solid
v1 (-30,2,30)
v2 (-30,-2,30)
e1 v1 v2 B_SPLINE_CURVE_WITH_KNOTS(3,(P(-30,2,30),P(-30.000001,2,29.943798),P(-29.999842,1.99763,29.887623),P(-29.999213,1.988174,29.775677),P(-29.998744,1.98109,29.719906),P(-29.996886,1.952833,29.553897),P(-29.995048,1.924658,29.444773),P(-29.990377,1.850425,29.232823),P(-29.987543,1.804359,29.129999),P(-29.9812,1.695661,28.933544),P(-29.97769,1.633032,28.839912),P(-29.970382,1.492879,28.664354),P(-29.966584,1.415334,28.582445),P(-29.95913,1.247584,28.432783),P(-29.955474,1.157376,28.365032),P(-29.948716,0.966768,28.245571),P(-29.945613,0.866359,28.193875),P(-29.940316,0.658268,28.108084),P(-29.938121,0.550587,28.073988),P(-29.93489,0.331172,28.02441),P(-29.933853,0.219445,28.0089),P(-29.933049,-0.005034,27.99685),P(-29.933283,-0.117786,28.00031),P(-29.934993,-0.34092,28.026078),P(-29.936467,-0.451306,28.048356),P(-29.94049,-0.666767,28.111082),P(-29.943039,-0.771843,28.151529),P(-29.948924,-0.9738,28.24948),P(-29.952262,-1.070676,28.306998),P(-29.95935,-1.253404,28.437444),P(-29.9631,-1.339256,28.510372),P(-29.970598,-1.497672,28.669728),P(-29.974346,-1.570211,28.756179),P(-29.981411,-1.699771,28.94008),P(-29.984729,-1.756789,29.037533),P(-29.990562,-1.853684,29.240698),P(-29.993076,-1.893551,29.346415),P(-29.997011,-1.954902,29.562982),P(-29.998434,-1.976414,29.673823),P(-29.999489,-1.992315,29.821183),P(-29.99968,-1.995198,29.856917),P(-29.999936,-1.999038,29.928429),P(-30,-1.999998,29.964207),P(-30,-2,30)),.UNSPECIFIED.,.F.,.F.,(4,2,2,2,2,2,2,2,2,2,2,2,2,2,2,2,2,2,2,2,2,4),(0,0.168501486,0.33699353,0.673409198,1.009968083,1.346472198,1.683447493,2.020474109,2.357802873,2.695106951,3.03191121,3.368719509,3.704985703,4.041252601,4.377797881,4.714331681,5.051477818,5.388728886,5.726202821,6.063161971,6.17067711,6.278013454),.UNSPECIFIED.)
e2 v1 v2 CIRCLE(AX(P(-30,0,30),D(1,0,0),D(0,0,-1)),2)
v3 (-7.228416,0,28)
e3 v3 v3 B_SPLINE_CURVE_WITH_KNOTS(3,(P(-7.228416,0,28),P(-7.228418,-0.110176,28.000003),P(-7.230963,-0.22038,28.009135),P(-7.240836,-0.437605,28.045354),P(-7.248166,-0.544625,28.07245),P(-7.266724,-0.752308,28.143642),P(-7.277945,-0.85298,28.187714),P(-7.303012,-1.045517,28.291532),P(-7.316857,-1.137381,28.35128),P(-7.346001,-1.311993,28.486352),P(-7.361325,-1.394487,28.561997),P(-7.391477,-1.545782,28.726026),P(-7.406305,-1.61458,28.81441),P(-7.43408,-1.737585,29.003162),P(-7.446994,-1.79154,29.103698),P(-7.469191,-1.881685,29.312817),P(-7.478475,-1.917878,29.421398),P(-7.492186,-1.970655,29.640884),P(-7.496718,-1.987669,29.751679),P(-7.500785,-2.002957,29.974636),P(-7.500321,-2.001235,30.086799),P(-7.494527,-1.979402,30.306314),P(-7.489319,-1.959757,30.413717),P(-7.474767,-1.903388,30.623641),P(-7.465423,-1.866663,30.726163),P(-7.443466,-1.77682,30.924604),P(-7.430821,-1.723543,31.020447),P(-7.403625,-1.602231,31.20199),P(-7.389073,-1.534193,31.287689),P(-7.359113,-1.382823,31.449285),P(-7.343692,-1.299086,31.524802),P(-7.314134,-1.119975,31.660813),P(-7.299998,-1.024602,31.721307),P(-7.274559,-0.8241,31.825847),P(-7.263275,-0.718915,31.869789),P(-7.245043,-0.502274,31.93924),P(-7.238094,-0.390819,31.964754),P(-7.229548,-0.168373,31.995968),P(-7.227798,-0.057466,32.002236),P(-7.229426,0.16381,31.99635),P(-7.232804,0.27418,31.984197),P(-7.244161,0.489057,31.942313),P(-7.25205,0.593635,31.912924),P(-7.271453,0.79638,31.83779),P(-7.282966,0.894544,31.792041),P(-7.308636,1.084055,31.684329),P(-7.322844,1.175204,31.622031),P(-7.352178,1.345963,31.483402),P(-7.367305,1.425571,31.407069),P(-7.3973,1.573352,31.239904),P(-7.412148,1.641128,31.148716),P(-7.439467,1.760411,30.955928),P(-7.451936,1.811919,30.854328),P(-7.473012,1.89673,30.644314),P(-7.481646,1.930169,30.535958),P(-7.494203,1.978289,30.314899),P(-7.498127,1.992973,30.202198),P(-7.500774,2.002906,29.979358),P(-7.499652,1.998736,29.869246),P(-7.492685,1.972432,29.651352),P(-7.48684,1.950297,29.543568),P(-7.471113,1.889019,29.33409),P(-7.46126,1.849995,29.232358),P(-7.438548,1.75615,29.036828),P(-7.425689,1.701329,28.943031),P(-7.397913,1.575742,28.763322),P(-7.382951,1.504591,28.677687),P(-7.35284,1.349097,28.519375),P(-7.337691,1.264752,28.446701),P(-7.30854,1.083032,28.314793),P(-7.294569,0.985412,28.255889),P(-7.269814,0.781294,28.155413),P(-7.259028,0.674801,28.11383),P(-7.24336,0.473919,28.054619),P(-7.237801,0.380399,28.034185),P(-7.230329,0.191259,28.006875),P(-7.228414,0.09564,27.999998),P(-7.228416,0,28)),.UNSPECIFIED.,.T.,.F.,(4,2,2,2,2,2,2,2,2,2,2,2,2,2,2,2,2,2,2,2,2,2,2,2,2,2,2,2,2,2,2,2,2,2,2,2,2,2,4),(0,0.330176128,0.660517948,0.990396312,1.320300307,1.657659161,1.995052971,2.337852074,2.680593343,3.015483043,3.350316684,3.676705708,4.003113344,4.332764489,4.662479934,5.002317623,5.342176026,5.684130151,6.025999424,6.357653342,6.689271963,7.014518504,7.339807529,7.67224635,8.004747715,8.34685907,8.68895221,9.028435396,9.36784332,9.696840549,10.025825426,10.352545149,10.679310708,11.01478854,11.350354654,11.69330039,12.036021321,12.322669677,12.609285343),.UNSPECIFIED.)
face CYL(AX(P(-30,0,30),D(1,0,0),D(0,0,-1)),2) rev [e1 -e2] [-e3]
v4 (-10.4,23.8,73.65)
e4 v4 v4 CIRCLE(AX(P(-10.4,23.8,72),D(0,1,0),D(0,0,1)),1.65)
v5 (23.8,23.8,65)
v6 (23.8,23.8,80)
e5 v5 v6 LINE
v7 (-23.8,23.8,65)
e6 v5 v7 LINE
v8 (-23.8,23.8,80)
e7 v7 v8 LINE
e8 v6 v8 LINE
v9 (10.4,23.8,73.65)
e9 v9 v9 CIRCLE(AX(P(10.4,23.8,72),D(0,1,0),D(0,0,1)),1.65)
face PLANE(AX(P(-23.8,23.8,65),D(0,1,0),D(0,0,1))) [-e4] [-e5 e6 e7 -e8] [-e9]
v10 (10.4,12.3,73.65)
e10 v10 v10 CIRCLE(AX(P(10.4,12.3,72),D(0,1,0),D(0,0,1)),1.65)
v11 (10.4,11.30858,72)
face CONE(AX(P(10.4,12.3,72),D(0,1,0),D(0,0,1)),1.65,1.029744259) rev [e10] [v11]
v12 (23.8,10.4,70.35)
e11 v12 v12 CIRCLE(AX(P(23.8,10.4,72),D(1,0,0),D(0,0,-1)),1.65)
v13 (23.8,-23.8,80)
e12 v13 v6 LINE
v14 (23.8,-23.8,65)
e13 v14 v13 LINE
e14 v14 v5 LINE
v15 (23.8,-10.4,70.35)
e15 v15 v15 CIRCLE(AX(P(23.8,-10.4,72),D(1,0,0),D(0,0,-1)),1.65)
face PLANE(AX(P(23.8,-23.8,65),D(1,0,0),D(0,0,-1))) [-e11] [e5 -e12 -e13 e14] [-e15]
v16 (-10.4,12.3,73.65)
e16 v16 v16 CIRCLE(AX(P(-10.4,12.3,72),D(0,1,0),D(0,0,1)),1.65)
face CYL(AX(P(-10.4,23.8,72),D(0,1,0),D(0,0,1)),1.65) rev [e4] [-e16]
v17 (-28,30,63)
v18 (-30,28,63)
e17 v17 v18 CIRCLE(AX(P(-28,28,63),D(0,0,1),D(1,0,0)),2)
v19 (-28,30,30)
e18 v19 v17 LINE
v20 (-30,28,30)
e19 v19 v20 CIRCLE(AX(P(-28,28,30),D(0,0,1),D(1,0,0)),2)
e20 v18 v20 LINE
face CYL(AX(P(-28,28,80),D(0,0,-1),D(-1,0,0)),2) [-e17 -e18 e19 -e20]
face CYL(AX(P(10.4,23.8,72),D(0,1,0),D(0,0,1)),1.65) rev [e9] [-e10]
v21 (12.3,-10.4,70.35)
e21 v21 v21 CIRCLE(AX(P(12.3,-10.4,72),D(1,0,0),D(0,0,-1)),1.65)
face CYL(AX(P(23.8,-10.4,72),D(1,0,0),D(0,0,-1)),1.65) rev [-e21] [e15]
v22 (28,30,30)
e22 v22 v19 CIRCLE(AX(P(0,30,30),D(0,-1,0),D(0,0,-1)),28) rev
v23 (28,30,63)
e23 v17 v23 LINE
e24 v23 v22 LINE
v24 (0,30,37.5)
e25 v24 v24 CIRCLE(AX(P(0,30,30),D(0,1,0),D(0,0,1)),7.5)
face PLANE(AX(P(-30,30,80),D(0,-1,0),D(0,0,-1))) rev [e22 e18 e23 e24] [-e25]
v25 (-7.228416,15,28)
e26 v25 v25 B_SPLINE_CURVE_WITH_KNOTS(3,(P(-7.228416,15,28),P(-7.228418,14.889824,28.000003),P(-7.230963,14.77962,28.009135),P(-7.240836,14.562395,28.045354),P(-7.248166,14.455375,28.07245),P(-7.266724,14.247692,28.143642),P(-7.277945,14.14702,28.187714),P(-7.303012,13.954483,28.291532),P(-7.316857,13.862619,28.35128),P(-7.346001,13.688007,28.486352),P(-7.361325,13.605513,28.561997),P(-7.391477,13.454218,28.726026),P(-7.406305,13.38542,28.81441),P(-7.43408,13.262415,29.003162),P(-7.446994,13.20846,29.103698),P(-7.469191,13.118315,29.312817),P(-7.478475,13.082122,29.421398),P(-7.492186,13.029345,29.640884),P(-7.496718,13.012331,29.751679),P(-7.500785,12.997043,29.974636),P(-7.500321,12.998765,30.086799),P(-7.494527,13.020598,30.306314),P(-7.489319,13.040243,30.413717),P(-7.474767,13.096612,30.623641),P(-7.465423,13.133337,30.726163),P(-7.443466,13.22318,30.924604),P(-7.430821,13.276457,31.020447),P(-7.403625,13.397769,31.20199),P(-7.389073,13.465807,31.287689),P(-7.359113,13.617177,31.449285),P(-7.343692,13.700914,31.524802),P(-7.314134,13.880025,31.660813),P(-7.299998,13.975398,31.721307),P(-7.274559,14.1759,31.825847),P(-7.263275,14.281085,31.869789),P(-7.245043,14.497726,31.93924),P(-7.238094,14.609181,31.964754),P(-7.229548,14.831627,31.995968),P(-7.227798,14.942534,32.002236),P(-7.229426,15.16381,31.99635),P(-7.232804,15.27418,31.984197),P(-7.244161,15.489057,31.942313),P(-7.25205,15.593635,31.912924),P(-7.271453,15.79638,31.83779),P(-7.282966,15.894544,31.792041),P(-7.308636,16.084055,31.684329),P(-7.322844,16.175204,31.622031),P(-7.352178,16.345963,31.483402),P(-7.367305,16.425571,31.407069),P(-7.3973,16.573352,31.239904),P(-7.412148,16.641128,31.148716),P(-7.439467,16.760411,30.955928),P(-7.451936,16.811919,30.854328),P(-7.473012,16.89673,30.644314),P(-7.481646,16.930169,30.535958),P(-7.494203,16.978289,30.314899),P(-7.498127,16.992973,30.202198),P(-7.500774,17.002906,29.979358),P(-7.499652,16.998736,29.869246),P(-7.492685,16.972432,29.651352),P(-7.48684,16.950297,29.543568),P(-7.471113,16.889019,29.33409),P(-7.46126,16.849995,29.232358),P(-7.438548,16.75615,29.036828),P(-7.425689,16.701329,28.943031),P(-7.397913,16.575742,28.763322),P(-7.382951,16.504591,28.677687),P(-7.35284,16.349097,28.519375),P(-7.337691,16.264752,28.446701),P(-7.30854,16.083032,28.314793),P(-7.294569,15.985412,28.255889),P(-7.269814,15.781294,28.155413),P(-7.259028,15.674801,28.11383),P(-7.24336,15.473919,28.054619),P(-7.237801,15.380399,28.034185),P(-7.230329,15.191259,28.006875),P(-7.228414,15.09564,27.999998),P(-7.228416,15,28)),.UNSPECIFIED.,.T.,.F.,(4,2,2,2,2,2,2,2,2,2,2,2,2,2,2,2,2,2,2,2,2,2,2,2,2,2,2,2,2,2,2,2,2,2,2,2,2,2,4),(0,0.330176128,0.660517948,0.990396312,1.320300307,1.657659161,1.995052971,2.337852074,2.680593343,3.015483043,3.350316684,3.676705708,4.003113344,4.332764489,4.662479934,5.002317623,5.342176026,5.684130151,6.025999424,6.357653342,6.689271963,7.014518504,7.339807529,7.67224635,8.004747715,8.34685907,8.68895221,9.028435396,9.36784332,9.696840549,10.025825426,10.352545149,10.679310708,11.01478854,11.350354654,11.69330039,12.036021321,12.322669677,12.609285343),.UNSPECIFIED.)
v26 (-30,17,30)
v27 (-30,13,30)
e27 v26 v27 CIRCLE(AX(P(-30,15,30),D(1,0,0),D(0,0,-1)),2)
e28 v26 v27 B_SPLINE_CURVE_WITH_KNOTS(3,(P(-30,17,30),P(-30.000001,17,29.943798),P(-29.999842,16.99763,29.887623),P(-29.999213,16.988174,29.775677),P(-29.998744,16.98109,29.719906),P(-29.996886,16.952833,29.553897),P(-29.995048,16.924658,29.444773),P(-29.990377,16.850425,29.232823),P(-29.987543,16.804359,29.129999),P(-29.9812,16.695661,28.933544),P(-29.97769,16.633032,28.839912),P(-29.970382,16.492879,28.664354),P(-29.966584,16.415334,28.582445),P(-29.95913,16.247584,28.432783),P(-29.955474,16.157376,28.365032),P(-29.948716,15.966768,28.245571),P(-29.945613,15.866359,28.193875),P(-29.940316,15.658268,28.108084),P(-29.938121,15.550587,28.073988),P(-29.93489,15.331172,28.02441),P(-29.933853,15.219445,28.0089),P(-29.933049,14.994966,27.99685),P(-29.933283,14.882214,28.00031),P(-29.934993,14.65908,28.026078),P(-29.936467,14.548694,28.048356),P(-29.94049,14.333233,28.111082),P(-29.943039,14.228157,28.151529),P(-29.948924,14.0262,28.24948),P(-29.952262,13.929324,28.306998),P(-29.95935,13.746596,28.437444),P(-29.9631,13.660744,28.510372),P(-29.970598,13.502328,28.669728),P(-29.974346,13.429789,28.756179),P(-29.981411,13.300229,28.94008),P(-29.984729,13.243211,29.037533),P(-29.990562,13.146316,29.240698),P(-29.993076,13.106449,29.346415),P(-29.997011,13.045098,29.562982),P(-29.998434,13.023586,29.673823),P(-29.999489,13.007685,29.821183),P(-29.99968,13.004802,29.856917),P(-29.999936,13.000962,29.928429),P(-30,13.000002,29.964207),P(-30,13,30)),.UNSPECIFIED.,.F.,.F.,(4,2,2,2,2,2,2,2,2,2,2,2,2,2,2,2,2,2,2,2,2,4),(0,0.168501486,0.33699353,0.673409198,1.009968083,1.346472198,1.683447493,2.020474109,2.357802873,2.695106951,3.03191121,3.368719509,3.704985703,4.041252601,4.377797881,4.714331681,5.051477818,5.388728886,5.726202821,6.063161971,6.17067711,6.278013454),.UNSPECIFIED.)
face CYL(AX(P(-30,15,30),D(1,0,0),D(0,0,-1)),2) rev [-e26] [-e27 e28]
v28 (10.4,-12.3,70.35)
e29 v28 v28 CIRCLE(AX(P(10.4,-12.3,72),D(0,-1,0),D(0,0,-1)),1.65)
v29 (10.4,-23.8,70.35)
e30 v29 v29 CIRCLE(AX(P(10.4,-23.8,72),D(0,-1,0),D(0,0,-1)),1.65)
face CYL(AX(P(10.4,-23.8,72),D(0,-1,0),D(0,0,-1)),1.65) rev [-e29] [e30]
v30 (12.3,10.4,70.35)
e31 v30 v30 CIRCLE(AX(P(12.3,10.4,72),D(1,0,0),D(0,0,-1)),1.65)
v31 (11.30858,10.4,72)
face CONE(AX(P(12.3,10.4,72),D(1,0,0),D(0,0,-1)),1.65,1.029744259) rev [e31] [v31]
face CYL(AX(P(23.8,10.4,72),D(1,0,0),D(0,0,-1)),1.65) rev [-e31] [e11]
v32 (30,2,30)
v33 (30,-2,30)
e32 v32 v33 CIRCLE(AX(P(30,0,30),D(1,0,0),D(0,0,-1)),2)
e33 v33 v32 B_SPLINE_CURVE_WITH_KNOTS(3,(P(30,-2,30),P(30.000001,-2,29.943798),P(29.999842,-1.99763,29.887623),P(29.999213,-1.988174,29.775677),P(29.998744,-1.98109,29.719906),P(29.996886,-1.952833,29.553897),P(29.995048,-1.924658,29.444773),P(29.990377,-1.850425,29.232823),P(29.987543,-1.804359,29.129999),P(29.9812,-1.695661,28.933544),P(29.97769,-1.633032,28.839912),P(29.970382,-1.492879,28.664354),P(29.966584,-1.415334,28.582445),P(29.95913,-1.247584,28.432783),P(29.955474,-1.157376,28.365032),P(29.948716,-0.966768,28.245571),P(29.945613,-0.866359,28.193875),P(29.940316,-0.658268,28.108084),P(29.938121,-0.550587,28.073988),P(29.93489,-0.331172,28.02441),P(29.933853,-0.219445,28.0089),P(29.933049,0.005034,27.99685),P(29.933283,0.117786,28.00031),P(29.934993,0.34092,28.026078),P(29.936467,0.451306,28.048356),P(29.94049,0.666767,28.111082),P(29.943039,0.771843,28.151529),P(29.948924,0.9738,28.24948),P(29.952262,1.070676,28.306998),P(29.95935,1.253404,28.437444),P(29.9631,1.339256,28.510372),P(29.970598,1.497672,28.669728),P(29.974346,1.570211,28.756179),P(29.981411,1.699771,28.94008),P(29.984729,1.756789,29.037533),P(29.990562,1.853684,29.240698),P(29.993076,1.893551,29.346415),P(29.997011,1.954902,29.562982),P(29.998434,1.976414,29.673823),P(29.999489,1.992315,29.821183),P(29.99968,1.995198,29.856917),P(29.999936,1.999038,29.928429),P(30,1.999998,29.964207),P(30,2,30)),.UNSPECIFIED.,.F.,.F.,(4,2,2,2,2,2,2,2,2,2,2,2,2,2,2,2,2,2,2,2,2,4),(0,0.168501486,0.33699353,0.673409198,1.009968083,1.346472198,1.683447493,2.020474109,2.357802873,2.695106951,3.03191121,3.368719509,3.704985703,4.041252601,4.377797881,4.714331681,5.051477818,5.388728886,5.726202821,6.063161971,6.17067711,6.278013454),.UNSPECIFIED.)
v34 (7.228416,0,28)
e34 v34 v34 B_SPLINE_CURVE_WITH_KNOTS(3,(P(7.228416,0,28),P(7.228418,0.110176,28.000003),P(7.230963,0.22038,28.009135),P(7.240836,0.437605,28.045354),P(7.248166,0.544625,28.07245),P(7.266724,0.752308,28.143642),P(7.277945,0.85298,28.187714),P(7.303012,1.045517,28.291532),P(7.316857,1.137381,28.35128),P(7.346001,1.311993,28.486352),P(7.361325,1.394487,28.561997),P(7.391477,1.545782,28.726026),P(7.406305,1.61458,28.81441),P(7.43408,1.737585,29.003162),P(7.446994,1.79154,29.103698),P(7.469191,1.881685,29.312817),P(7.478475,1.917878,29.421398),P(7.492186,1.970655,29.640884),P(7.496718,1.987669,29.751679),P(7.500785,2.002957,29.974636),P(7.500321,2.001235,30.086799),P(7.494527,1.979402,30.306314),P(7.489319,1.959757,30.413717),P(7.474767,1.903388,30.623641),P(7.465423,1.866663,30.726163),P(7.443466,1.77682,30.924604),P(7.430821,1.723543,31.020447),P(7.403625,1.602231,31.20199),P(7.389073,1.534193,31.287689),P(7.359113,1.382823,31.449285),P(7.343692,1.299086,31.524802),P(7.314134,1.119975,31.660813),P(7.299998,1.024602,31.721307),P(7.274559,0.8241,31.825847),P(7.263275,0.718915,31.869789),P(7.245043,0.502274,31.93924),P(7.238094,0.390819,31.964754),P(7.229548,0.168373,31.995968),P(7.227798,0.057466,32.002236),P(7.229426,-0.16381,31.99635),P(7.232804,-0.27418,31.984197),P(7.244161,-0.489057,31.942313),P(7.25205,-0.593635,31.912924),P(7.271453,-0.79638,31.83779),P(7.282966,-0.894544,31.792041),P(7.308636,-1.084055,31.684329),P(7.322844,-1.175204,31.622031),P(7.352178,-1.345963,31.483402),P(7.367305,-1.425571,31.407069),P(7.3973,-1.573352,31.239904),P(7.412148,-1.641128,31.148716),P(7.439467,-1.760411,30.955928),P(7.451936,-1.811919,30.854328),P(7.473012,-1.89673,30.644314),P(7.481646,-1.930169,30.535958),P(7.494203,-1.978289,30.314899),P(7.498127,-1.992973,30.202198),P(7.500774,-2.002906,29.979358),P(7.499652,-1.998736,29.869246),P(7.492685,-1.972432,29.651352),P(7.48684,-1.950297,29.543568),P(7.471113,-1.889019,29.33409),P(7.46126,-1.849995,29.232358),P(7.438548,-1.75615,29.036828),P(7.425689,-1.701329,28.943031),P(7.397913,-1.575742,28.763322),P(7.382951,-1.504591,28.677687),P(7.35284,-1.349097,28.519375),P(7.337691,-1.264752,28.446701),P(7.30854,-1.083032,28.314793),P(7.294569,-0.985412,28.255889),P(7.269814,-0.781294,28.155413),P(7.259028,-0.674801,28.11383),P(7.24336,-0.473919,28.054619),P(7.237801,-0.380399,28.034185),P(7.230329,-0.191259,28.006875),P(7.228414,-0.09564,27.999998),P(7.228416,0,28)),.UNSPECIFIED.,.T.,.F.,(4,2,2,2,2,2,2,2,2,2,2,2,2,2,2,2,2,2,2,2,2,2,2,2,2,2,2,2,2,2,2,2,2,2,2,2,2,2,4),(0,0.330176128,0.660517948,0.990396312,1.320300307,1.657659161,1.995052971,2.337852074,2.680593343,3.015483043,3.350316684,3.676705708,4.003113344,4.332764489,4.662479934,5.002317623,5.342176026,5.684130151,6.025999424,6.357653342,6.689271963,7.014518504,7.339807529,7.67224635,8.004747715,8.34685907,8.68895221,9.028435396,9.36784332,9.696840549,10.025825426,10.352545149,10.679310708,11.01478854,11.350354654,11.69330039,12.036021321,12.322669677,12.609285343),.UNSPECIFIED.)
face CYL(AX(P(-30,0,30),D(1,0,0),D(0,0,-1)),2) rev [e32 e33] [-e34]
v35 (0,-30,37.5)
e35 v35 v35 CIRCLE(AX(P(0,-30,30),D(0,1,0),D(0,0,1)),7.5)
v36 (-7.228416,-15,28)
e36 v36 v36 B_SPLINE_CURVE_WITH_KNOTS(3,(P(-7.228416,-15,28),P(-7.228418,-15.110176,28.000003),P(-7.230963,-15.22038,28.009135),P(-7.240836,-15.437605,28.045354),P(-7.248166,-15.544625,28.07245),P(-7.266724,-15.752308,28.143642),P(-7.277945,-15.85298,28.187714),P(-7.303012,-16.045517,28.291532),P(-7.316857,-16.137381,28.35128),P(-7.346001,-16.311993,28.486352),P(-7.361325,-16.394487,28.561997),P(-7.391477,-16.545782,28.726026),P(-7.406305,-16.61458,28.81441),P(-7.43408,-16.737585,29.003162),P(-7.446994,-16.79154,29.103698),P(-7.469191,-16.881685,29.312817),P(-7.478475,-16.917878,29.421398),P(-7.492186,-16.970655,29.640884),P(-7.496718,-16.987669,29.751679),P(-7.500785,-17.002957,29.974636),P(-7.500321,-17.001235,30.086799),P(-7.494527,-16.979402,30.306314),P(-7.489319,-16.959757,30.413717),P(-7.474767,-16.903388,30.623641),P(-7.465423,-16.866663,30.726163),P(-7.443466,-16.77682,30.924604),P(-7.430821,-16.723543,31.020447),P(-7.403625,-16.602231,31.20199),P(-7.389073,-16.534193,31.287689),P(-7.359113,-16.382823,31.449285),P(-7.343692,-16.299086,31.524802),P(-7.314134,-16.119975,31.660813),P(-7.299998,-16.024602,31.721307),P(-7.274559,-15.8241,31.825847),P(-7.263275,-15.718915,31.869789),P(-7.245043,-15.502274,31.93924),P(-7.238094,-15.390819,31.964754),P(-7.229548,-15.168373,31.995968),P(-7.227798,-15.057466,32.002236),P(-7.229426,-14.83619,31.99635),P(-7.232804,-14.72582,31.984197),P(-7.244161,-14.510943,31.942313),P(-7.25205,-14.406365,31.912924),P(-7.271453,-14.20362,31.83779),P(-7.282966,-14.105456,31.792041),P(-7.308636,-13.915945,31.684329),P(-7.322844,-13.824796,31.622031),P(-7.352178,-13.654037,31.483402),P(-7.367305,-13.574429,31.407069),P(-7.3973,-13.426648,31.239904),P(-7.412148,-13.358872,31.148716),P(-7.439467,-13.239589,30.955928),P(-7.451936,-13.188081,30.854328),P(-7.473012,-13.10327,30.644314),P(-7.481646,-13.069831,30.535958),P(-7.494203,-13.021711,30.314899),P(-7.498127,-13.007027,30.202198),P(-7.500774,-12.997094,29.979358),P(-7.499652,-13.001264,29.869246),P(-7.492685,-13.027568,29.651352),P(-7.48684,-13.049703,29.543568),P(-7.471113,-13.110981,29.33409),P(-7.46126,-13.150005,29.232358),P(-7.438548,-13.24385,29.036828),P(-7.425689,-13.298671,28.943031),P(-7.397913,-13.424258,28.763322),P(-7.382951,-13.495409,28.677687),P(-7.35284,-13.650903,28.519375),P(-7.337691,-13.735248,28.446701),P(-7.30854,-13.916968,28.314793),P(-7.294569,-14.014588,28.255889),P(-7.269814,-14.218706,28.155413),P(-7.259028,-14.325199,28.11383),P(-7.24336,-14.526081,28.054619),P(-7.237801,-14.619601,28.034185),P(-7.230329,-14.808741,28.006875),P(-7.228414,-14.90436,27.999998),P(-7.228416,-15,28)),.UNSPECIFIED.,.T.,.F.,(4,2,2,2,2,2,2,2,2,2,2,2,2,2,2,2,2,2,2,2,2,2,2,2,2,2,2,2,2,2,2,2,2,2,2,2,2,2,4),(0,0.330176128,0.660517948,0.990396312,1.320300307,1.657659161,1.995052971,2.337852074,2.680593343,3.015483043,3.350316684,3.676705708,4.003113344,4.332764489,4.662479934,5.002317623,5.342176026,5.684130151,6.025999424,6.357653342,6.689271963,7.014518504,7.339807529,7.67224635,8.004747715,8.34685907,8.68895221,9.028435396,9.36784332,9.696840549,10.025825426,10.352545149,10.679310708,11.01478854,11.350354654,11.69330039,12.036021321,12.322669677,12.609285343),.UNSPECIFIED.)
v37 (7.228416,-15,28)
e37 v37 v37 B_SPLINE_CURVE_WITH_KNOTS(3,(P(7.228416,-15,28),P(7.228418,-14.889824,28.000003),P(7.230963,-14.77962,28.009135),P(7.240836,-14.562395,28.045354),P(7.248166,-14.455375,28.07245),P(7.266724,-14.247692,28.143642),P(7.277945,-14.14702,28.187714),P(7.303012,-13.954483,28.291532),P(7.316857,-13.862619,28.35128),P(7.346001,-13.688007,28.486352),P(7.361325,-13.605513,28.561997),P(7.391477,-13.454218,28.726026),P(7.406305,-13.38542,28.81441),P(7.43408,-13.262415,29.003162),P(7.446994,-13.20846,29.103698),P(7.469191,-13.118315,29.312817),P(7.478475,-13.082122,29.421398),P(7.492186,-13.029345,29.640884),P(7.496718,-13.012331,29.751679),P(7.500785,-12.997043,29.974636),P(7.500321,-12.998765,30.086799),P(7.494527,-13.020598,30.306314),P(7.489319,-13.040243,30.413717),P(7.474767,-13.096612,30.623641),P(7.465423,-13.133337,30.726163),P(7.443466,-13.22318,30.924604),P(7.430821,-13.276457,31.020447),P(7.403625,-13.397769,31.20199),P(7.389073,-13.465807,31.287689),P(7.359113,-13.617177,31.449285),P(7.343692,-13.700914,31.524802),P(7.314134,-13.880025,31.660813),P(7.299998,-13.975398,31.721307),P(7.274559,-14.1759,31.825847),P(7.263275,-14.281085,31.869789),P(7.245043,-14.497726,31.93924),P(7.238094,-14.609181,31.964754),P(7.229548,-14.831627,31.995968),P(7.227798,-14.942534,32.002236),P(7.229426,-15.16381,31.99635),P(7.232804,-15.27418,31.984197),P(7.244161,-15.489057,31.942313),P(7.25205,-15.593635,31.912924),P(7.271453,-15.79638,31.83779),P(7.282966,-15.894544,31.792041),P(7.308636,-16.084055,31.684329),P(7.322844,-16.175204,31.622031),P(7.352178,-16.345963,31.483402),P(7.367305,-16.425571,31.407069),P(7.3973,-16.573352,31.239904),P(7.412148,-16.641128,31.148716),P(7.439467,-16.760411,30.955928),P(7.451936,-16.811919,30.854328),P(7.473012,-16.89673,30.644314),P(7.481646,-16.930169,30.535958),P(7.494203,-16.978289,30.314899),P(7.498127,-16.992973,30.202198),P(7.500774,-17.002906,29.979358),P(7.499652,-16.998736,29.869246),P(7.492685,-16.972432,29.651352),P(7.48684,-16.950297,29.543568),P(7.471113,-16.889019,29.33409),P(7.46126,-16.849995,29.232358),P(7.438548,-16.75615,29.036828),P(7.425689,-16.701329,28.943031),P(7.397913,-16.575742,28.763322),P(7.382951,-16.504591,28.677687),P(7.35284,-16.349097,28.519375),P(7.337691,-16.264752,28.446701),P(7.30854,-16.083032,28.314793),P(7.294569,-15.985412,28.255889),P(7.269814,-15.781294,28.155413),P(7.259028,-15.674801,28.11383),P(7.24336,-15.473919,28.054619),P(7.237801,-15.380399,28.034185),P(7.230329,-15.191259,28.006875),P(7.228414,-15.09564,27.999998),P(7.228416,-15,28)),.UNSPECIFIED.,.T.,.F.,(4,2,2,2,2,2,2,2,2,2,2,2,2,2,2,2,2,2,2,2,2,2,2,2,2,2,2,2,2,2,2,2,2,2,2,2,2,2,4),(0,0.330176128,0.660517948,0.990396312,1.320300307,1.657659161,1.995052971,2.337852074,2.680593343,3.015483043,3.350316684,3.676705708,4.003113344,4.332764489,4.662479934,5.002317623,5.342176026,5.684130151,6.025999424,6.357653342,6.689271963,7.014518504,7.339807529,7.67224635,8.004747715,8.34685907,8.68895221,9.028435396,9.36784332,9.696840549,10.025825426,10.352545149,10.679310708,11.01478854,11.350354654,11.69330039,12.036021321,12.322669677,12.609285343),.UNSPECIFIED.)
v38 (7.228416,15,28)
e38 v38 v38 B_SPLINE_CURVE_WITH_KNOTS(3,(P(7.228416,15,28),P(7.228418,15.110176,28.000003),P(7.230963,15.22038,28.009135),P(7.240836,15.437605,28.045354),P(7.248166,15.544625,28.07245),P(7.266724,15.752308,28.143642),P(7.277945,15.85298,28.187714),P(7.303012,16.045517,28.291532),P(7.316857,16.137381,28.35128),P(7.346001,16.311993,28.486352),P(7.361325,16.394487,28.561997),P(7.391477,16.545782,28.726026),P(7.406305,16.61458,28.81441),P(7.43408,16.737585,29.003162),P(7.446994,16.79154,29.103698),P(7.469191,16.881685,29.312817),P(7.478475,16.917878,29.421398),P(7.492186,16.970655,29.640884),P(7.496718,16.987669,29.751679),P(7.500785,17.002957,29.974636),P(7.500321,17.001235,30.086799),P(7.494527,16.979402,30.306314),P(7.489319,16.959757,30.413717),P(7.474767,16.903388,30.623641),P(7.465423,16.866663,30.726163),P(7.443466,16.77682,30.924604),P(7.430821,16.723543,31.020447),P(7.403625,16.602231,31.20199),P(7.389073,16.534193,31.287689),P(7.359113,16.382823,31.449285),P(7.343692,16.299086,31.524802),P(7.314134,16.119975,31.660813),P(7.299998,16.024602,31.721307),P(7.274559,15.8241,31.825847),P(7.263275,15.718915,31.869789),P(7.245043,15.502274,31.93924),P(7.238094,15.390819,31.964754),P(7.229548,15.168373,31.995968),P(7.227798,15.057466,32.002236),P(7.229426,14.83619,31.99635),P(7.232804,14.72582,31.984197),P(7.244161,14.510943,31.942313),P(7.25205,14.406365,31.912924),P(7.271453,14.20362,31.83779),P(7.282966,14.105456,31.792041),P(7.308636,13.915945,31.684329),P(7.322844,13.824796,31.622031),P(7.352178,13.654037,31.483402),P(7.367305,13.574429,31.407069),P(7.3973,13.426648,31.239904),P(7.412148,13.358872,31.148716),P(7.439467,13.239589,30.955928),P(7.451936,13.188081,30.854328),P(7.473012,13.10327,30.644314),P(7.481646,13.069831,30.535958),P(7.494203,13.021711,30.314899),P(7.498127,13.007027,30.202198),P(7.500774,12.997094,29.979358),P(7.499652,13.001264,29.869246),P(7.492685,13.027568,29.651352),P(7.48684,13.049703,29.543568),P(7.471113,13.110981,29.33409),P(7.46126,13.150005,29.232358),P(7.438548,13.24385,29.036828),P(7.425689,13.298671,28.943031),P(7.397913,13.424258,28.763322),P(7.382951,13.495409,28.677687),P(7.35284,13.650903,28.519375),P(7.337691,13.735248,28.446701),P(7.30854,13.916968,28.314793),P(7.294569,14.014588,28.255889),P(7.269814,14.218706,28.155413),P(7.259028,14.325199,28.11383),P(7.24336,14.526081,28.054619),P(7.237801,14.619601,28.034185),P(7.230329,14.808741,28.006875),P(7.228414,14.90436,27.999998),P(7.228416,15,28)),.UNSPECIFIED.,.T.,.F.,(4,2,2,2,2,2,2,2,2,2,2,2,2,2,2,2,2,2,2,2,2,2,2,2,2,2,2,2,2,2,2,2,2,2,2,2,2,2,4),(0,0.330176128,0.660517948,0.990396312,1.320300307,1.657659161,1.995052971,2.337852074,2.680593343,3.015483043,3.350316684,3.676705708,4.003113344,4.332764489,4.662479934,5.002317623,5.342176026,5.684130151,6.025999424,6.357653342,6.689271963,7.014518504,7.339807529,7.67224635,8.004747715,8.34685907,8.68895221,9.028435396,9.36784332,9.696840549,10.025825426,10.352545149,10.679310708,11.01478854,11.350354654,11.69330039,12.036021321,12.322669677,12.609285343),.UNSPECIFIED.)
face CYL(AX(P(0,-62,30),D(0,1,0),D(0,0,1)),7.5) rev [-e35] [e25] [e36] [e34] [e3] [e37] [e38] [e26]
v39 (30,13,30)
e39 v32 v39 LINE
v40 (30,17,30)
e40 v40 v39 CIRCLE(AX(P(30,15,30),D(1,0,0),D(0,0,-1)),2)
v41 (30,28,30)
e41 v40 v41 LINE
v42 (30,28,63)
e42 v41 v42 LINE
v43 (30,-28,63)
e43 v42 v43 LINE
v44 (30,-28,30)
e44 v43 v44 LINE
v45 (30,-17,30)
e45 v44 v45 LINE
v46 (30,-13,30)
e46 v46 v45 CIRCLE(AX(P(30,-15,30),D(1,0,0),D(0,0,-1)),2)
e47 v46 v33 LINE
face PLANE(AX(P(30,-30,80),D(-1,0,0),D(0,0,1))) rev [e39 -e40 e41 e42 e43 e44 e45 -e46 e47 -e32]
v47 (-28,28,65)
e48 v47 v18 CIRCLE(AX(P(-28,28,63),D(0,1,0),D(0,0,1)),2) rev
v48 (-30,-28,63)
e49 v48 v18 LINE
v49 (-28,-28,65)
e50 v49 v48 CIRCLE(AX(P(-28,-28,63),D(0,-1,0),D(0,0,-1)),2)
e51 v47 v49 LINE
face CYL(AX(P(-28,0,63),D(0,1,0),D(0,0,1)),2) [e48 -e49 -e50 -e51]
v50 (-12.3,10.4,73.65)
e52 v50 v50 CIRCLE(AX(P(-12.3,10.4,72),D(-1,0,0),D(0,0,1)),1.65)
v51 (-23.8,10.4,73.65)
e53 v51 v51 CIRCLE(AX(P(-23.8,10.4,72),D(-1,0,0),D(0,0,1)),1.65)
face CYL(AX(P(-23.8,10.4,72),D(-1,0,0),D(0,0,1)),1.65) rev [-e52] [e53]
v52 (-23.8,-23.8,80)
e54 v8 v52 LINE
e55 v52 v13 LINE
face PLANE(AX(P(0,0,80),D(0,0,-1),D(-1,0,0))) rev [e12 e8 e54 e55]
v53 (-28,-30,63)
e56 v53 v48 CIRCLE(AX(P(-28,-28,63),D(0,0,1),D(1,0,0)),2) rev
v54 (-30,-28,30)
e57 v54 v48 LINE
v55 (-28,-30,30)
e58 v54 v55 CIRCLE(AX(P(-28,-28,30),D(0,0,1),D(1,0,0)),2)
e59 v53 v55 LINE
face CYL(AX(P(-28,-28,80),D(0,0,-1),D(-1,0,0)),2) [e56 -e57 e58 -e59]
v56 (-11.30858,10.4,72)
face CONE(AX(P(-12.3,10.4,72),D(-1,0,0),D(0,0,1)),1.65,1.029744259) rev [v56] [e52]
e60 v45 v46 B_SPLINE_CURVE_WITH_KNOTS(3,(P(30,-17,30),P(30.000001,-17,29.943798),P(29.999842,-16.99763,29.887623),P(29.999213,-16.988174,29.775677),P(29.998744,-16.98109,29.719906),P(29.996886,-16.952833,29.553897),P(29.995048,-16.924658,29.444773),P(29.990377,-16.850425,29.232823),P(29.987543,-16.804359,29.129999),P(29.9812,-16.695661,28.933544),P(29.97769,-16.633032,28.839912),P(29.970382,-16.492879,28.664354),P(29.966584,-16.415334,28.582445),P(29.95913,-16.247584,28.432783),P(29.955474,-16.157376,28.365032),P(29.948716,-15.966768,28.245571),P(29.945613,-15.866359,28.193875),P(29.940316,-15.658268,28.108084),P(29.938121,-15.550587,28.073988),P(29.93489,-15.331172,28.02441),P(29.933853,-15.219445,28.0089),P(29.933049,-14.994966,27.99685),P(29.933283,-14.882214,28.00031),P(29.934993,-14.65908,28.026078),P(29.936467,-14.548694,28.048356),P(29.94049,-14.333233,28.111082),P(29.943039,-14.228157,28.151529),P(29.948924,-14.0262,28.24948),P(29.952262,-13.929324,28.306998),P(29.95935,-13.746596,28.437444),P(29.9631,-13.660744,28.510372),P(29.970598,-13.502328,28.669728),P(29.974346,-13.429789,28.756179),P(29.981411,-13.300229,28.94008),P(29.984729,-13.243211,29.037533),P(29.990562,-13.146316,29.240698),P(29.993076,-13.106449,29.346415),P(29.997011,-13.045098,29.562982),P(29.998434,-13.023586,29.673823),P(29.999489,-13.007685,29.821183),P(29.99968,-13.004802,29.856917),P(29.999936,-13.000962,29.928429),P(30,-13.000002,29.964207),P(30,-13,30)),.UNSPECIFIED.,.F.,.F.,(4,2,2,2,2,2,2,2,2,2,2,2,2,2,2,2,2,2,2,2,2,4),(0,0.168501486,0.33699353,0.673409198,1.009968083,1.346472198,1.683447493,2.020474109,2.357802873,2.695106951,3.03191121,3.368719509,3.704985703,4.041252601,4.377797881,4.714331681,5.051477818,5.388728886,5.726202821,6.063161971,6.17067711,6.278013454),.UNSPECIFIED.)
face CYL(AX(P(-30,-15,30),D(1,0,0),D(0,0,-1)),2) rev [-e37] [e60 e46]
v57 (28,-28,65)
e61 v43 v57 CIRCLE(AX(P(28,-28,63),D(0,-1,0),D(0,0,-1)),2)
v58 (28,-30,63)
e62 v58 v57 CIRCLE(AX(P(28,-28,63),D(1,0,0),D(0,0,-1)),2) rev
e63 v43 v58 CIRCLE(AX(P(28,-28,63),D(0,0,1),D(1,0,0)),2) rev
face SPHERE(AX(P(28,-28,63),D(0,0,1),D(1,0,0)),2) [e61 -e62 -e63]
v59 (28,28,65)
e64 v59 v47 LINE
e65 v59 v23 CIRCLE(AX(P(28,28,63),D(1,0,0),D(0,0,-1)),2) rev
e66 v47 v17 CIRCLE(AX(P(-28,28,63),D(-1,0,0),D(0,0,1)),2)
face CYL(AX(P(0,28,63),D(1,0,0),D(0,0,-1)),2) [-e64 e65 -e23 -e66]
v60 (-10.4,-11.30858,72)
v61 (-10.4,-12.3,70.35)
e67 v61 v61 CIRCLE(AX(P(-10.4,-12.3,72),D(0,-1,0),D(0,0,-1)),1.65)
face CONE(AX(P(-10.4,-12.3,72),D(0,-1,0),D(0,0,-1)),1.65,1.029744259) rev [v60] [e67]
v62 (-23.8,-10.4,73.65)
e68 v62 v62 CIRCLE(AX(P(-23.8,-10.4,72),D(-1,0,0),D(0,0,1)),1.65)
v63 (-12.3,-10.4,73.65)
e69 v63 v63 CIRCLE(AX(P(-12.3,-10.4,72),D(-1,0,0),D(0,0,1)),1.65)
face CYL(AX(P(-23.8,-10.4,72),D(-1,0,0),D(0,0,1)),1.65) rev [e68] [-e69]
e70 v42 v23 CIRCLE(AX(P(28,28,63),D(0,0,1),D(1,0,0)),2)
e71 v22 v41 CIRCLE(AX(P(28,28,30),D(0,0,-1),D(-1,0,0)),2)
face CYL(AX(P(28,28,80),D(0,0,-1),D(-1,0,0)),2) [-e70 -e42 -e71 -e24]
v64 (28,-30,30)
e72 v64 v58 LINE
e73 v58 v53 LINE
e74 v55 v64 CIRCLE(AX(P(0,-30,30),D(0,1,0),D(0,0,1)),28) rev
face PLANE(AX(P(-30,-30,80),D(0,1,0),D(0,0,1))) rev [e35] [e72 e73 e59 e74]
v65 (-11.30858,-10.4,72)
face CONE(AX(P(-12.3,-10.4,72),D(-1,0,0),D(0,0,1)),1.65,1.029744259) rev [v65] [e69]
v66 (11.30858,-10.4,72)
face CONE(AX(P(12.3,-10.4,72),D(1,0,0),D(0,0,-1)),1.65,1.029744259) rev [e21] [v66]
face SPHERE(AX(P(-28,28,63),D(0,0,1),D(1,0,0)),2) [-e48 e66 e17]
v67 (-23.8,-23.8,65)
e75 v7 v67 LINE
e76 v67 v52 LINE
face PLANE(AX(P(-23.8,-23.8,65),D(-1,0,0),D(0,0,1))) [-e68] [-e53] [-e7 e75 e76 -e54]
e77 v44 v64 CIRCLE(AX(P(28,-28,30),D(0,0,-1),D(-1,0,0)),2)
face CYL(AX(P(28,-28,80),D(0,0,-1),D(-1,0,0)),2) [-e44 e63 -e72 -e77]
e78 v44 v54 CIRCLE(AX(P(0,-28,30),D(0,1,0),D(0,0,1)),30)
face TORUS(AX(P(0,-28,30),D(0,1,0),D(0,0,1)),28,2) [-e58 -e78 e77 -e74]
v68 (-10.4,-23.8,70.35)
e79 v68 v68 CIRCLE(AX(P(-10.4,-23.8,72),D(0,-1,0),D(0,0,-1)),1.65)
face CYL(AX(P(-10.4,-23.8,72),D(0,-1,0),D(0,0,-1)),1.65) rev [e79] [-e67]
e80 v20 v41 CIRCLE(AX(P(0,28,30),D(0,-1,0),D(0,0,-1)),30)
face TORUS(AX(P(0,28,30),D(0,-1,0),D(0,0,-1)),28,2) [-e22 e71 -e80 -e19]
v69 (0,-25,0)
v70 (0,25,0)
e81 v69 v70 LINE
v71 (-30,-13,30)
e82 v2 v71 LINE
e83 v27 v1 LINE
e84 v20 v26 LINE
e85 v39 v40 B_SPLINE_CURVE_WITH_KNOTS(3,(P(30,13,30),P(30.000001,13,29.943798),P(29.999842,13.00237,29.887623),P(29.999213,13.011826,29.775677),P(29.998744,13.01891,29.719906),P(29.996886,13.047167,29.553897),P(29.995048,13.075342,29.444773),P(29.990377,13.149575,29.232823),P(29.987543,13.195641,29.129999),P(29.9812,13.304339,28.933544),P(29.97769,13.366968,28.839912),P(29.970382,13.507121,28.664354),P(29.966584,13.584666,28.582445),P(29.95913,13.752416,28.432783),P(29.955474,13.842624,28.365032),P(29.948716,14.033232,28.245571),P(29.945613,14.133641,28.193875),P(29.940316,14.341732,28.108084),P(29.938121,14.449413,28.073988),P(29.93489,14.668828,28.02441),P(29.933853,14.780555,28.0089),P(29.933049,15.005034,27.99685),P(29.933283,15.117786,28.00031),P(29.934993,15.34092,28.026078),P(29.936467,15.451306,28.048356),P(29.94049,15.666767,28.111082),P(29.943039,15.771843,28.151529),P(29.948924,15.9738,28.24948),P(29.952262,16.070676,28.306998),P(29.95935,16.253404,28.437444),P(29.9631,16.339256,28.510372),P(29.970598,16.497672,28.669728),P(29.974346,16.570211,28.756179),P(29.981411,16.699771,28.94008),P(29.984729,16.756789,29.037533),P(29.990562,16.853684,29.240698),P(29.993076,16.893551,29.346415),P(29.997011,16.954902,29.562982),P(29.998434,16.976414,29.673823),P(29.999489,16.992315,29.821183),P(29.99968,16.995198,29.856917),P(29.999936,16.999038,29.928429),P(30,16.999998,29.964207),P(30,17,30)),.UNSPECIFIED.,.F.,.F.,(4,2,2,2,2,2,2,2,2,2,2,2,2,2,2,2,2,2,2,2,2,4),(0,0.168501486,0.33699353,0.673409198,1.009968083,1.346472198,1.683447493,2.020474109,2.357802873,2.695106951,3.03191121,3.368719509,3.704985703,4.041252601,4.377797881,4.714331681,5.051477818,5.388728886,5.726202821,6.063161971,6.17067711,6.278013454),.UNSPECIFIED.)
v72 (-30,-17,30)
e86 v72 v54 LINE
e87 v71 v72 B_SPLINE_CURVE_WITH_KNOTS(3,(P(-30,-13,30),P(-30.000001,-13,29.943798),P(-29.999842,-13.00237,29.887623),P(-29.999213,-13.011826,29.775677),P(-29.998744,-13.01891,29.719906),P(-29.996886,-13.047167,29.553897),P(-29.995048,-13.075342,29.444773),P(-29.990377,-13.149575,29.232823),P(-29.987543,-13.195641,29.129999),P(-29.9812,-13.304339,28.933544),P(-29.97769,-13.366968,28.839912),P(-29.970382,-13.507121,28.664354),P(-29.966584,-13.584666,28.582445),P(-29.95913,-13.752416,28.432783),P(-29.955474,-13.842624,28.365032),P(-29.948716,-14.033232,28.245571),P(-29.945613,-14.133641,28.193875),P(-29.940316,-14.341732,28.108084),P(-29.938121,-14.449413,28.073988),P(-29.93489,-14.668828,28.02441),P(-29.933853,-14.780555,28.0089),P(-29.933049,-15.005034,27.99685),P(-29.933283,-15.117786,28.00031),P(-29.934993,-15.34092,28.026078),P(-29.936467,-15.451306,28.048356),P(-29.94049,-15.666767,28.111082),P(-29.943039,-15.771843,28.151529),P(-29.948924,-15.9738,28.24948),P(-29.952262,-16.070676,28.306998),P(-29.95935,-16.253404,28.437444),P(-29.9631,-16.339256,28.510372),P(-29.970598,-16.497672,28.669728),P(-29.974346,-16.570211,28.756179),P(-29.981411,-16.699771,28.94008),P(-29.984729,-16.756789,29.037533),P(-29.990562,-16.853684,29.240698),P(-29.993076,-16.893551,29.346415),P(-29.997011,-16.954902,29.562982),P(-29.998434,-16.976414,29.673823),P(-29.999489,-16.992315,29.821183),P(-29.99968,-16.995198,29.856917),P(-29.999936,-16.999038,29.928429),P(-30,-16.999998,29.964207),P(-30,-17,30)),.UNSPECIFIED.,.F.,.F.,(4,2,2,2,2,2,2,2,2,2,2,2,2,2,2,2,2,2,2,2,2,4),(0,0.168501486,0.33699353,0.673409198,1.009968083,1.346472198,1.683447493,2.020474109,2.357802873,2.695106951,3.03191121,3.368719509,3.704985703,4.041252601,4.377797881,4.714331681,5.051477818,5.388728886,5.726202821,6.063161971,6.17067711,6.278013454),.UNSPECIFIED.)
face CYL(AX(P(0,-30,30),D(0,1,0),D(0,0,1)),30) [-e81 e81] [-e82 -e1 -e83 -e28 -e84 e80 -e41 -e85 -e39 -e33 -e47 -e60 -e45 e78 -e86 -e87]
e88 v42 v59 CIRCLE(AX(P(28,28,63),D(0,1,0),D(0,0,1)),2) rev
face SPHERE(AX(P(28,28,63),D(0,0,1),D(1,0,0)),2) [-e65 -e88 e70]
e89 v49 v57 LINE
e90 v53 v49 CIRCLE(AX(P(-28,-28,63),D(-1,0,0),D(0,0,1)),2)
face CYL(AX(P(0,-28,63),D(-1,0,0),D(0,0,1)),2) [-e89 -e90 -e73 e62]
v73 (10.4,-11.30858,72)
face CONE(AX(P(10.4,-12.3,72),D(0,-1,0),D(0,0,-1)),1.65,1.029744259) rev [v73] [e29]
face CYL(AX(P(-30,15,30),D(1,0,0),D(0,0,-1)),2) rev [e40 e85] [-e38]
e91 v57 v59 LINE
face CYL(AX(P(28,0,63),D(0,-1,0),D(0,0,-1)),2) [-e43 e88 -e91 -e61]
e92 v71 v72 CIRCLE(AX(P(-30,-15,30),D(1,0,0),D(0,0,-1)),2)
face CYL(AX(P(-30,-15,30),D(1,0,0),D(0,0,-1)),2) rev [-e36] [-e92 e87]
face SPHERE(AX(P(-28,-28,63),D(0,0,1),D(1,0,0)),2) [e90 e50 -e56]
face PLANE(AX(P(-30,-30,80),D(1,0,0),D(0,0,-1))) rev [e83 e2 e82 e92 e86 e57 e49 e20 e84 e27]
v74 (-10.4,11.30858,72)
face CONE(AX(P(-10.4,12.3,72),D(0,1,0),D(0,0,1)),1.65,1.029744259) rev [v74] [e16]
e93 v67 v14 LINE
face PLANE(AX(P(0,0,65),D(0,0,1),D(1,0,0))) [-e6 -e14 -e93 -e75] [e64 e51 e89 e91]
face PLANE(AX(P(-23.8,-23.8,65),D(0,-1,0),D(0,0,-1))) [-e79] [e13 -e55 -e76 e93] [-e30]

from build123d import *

# Parameters (mm, degrees)
SKETCH2_W                  = 60
SKETCH2_H                  = 60
BOSS_EXTRUDE1_DEPTH        = 80
SKETCH3_OUTSIDE_W          = 85.324
SKETCH3_OUTSIDE_H          = 85.324
SKETCH3_OUTSIDE_W_2        = 47.6
SKETCH3_OUTSIDE_H_2        = 47.6
CUT_EXTRUDE1_DEPTH         = 15
SKETCH4_W                  = 60
SKETCH4_H                  = 5
CUT_EXTRUDE2_DEPTH         = 87
SKETCH5_R                  = 7.5
CUT_EXTRUDE3_DEPTH         = 87
M4_TAPPED_HOLE1_AT_2_COUNT = 2
M4_TAPPED_HOLE1_AT_2_PITCH = 20.8
CIRPATTERN1_COUNT          = 4
FILLET2_R                  = 30
SKETCH19_R                 = 2
CUT_EXTRUDE6_DEPTH         = 105.403065089
BOSS_EXTRUDE3_START        = 5
SKETCH21_R                 = 7.5
BOSS_EXTRUDE3_DEPTH        = 5
FILLET3_R                  = 2


with BuildPart() as part:
    # Sketch2 → Boss-Extrude1 (new body)
    with BuildSketch(Plane.XY):
        Rectangle(SKETCH2_W, SKETCH2_H)
    extrude(amount=BOSS_EXTRUDE1_DEPTH)

    # Sketch3 outside → Cut-Extrude1 (cut)
    with BuildSketch(Plane.XY.offset(80)):
        Rectangle(SKETCH3_OUTSIDE_W, SKETCH3_OUTSIDE_H)
        Rectangle(SKETCH3_OUTSIDE_W_2, SKETCH3_OUTSIDE_H_2, mode=Mode.SUBTRACT)
    extrude(amount=-CUT_EXTRUDE1_DEPTH, mode=Mode.SUBTRACT)

    # Sketch4 → Cut-Extrude2 (cut)
    with BuildSketch(Plane(origin=(30, 0, 0), x_dir=(0, 0, -1), z_dir=(1, 0, 0))):
        with Locations((-30, 27.5)):
            Rectangle(SKETCH4_W, SKETCH4_H)
        with Locations((-30, -27.5)):
            Rectangle(SKETCH4_W, SKETCH4_H)
    extrude(amount=-CUT_EXTRUDE2_DEPTH, mode=Mode.SUBTRACT)

    # Sketch5 → Cut-Extrude3 (cut)
    with BuildSketch(Plane(origin=(0, 25, 0), x_dir=(1, 0, 0), z_dir=(0, 1, 0))):
        with Locations(Location((0, -30, 0), (0, 0, 270))):
            Circle(SKETCH5_R)
    extrude(amount=-CUT_EXTRUDE3_DEPTH, mode=Mode.SUBTRACT)

    # Sketch16 → M4 Tapped Hole1 (revolve, cut)
    with BuildSketch(Plane(origin=(-23.8, 10.4, 72), x_dir=(0, 0, 1), z_dir=(0, 1, 0))):
        Polygon((0, 0), (0, 12.491420021), (1.65, 11.5), (1.65, 0), align=None)
    m4_tapped_hole1 = revolve(axis=Axis((-30.15, 10.4, 72), (1, 0, 0)), mode=Mode.SUBTRACT)

    # M4 Tapped Hole1 at 2: M4 Tapped Hole1 ×2
    with Locations(*[(0, -i * M4_TAPPED_HOLE1_AT_2_PITCH, 0) for i in range(1, M4_TAPPED_HOLE1_AT_2_COUNT)]):
        add(m4_tapped_hole1, mode=Mode.SUBTRACT)

    # CirPattern1: M4 Tapped Hole1 ×4 about axis
    cirpattern1_axis = Axis((0, 0, 0), (0, 0, 1))
    for i in range(1, CIRPATTERN1_COUNT):
        add(m4_tapped_hole1.rotate(cirpattern1_axis, i * 360 / CIRPATTERN1_COUNT), mode=Mode.SUBTRACT)

    # CirPattern1 copy 1 sketch → CirPattern1 copy 1 (revolve, cut)
    with BuildSketch(Plane(origin=(10.4, -23.8, 72), x_dir=(0, 0, 1), z_dir=(-1, 0, 0))):
        Polygon((0, 0), (0, 12.491420021), (1.65, 11.5), (1.65, 0), align=None)
    revolve(axis=Axis((10.4, -30.15, 72), (0, 1, 0)), mode=Mode.SUBTRACT)

    # CirPattern1 copy 2 sketch → CirPattern1 copy 2 (revolve, cut)
    with BuildSketch(Plane(origin=(23.8, 10.4, 72), x_dir=(0, 0, 1), z_dir=(0, -1, 0))):
        Polygon((0, 0), (0, 12.491420021), (1.65, 11.5), (1.65, 0), align=None)
    revolve(axis=Axis((30.15, 10.4, 72), (-1, 0, 0)), mode=Mode.SUBTRACT)

    # CirPattern1 copy 3 sketch → CirPattern1 copy 3 (revolve, cut)
    with BuildSketch(Plane(origin=(-10.4, 23.8, 72), x_dir=(0, 0, 1), z_dir=(1, 0, 0))):
        Polygon((0, 0), (0, 12.491420021), (1.65, 11.5), (1.65, 0), align=None)
    revolve(axis=Axis((-10.4, 30.15, 72), (0, -1, 0)), mode=Mode.SUBTRACT)

    # Fillet2
    fillet2_edges = [part.edges().sort_by_distance(p)[0] for p in [
        (30, 0, 0),
        (-30, 0, 0),
    ]]
    fillet(fillet2_edges, radius=FILLET2_R - 0.0001)  # a hair under: the kernel refuses the full size

    # Sketch19 → Cut-Extrude6 (cut, through all)
    with BuildSketch(Plane(origin=(30, 0, 0), x_dir=(0, 0, -1), z_dir=(1, 0, 0))):
        with Locations((-30, 0)):
            Circle(SKETCH19_R)
        with Locations((-30, 15)):
            Circle(SKETCH19_R)
        with Locations((-30, -15)):
            Circle(SKETCH19_R)
    extrude(amount=-CUT_EXTRUDE6_DEPTH, mode=Mode.SUBTRACT)

    # Sketch21 → Boss-Extrude3 (add)
    with BuildSketch(Plane(origin=(0, 25, 0), x_dir=(1, 0, 0), z_dir=(0, 1, 0)).offset(BOSS_EXTRUDE3_START)):
        with BuildLine():
            Line((30, -60), (30, -30))
            ThreePointArc((30, -30), (21.213203436, -8.786796564), (0, 0))
            ThreePointArc((0, 0), (-21.213203436, -8.786796564), (-30, -30))
            Line((-30, -30), (-30, -60))
            Line((-30, -60), (30, -60))
        make_face()
        with Locations(Location((0, -30, 0), (0, 0, 270))):
            Circle(SKETCH21_R, mode=Mode.SUBTRACT)
    boss_extrude3 = extrude(amount=-BOSS_EXTRUDE3_DEPTH)

    # Mirror4: Boss-Extrude3 across plane
    add(boss_extrude3.mirror(Plane.ZX))

    # Fillet3
    fillet3_edges = [part.edges().sort_by_distance(p)[0] for p in [
        (30, -30, 47.5),
        (-30, -30, 47.5),
        (0, -30, 65),
        (-30, 30, 47.5),
        (30, 30, 47.5),
        (0, 30, 0),
        (0, -30, 0),
        (30, 0, 65),
        (0, 30, 65),
        (-30, 0, 65),
    ]]
    fillet(fillet3_edges, radius=FILLET3_R)


solid = part.part
